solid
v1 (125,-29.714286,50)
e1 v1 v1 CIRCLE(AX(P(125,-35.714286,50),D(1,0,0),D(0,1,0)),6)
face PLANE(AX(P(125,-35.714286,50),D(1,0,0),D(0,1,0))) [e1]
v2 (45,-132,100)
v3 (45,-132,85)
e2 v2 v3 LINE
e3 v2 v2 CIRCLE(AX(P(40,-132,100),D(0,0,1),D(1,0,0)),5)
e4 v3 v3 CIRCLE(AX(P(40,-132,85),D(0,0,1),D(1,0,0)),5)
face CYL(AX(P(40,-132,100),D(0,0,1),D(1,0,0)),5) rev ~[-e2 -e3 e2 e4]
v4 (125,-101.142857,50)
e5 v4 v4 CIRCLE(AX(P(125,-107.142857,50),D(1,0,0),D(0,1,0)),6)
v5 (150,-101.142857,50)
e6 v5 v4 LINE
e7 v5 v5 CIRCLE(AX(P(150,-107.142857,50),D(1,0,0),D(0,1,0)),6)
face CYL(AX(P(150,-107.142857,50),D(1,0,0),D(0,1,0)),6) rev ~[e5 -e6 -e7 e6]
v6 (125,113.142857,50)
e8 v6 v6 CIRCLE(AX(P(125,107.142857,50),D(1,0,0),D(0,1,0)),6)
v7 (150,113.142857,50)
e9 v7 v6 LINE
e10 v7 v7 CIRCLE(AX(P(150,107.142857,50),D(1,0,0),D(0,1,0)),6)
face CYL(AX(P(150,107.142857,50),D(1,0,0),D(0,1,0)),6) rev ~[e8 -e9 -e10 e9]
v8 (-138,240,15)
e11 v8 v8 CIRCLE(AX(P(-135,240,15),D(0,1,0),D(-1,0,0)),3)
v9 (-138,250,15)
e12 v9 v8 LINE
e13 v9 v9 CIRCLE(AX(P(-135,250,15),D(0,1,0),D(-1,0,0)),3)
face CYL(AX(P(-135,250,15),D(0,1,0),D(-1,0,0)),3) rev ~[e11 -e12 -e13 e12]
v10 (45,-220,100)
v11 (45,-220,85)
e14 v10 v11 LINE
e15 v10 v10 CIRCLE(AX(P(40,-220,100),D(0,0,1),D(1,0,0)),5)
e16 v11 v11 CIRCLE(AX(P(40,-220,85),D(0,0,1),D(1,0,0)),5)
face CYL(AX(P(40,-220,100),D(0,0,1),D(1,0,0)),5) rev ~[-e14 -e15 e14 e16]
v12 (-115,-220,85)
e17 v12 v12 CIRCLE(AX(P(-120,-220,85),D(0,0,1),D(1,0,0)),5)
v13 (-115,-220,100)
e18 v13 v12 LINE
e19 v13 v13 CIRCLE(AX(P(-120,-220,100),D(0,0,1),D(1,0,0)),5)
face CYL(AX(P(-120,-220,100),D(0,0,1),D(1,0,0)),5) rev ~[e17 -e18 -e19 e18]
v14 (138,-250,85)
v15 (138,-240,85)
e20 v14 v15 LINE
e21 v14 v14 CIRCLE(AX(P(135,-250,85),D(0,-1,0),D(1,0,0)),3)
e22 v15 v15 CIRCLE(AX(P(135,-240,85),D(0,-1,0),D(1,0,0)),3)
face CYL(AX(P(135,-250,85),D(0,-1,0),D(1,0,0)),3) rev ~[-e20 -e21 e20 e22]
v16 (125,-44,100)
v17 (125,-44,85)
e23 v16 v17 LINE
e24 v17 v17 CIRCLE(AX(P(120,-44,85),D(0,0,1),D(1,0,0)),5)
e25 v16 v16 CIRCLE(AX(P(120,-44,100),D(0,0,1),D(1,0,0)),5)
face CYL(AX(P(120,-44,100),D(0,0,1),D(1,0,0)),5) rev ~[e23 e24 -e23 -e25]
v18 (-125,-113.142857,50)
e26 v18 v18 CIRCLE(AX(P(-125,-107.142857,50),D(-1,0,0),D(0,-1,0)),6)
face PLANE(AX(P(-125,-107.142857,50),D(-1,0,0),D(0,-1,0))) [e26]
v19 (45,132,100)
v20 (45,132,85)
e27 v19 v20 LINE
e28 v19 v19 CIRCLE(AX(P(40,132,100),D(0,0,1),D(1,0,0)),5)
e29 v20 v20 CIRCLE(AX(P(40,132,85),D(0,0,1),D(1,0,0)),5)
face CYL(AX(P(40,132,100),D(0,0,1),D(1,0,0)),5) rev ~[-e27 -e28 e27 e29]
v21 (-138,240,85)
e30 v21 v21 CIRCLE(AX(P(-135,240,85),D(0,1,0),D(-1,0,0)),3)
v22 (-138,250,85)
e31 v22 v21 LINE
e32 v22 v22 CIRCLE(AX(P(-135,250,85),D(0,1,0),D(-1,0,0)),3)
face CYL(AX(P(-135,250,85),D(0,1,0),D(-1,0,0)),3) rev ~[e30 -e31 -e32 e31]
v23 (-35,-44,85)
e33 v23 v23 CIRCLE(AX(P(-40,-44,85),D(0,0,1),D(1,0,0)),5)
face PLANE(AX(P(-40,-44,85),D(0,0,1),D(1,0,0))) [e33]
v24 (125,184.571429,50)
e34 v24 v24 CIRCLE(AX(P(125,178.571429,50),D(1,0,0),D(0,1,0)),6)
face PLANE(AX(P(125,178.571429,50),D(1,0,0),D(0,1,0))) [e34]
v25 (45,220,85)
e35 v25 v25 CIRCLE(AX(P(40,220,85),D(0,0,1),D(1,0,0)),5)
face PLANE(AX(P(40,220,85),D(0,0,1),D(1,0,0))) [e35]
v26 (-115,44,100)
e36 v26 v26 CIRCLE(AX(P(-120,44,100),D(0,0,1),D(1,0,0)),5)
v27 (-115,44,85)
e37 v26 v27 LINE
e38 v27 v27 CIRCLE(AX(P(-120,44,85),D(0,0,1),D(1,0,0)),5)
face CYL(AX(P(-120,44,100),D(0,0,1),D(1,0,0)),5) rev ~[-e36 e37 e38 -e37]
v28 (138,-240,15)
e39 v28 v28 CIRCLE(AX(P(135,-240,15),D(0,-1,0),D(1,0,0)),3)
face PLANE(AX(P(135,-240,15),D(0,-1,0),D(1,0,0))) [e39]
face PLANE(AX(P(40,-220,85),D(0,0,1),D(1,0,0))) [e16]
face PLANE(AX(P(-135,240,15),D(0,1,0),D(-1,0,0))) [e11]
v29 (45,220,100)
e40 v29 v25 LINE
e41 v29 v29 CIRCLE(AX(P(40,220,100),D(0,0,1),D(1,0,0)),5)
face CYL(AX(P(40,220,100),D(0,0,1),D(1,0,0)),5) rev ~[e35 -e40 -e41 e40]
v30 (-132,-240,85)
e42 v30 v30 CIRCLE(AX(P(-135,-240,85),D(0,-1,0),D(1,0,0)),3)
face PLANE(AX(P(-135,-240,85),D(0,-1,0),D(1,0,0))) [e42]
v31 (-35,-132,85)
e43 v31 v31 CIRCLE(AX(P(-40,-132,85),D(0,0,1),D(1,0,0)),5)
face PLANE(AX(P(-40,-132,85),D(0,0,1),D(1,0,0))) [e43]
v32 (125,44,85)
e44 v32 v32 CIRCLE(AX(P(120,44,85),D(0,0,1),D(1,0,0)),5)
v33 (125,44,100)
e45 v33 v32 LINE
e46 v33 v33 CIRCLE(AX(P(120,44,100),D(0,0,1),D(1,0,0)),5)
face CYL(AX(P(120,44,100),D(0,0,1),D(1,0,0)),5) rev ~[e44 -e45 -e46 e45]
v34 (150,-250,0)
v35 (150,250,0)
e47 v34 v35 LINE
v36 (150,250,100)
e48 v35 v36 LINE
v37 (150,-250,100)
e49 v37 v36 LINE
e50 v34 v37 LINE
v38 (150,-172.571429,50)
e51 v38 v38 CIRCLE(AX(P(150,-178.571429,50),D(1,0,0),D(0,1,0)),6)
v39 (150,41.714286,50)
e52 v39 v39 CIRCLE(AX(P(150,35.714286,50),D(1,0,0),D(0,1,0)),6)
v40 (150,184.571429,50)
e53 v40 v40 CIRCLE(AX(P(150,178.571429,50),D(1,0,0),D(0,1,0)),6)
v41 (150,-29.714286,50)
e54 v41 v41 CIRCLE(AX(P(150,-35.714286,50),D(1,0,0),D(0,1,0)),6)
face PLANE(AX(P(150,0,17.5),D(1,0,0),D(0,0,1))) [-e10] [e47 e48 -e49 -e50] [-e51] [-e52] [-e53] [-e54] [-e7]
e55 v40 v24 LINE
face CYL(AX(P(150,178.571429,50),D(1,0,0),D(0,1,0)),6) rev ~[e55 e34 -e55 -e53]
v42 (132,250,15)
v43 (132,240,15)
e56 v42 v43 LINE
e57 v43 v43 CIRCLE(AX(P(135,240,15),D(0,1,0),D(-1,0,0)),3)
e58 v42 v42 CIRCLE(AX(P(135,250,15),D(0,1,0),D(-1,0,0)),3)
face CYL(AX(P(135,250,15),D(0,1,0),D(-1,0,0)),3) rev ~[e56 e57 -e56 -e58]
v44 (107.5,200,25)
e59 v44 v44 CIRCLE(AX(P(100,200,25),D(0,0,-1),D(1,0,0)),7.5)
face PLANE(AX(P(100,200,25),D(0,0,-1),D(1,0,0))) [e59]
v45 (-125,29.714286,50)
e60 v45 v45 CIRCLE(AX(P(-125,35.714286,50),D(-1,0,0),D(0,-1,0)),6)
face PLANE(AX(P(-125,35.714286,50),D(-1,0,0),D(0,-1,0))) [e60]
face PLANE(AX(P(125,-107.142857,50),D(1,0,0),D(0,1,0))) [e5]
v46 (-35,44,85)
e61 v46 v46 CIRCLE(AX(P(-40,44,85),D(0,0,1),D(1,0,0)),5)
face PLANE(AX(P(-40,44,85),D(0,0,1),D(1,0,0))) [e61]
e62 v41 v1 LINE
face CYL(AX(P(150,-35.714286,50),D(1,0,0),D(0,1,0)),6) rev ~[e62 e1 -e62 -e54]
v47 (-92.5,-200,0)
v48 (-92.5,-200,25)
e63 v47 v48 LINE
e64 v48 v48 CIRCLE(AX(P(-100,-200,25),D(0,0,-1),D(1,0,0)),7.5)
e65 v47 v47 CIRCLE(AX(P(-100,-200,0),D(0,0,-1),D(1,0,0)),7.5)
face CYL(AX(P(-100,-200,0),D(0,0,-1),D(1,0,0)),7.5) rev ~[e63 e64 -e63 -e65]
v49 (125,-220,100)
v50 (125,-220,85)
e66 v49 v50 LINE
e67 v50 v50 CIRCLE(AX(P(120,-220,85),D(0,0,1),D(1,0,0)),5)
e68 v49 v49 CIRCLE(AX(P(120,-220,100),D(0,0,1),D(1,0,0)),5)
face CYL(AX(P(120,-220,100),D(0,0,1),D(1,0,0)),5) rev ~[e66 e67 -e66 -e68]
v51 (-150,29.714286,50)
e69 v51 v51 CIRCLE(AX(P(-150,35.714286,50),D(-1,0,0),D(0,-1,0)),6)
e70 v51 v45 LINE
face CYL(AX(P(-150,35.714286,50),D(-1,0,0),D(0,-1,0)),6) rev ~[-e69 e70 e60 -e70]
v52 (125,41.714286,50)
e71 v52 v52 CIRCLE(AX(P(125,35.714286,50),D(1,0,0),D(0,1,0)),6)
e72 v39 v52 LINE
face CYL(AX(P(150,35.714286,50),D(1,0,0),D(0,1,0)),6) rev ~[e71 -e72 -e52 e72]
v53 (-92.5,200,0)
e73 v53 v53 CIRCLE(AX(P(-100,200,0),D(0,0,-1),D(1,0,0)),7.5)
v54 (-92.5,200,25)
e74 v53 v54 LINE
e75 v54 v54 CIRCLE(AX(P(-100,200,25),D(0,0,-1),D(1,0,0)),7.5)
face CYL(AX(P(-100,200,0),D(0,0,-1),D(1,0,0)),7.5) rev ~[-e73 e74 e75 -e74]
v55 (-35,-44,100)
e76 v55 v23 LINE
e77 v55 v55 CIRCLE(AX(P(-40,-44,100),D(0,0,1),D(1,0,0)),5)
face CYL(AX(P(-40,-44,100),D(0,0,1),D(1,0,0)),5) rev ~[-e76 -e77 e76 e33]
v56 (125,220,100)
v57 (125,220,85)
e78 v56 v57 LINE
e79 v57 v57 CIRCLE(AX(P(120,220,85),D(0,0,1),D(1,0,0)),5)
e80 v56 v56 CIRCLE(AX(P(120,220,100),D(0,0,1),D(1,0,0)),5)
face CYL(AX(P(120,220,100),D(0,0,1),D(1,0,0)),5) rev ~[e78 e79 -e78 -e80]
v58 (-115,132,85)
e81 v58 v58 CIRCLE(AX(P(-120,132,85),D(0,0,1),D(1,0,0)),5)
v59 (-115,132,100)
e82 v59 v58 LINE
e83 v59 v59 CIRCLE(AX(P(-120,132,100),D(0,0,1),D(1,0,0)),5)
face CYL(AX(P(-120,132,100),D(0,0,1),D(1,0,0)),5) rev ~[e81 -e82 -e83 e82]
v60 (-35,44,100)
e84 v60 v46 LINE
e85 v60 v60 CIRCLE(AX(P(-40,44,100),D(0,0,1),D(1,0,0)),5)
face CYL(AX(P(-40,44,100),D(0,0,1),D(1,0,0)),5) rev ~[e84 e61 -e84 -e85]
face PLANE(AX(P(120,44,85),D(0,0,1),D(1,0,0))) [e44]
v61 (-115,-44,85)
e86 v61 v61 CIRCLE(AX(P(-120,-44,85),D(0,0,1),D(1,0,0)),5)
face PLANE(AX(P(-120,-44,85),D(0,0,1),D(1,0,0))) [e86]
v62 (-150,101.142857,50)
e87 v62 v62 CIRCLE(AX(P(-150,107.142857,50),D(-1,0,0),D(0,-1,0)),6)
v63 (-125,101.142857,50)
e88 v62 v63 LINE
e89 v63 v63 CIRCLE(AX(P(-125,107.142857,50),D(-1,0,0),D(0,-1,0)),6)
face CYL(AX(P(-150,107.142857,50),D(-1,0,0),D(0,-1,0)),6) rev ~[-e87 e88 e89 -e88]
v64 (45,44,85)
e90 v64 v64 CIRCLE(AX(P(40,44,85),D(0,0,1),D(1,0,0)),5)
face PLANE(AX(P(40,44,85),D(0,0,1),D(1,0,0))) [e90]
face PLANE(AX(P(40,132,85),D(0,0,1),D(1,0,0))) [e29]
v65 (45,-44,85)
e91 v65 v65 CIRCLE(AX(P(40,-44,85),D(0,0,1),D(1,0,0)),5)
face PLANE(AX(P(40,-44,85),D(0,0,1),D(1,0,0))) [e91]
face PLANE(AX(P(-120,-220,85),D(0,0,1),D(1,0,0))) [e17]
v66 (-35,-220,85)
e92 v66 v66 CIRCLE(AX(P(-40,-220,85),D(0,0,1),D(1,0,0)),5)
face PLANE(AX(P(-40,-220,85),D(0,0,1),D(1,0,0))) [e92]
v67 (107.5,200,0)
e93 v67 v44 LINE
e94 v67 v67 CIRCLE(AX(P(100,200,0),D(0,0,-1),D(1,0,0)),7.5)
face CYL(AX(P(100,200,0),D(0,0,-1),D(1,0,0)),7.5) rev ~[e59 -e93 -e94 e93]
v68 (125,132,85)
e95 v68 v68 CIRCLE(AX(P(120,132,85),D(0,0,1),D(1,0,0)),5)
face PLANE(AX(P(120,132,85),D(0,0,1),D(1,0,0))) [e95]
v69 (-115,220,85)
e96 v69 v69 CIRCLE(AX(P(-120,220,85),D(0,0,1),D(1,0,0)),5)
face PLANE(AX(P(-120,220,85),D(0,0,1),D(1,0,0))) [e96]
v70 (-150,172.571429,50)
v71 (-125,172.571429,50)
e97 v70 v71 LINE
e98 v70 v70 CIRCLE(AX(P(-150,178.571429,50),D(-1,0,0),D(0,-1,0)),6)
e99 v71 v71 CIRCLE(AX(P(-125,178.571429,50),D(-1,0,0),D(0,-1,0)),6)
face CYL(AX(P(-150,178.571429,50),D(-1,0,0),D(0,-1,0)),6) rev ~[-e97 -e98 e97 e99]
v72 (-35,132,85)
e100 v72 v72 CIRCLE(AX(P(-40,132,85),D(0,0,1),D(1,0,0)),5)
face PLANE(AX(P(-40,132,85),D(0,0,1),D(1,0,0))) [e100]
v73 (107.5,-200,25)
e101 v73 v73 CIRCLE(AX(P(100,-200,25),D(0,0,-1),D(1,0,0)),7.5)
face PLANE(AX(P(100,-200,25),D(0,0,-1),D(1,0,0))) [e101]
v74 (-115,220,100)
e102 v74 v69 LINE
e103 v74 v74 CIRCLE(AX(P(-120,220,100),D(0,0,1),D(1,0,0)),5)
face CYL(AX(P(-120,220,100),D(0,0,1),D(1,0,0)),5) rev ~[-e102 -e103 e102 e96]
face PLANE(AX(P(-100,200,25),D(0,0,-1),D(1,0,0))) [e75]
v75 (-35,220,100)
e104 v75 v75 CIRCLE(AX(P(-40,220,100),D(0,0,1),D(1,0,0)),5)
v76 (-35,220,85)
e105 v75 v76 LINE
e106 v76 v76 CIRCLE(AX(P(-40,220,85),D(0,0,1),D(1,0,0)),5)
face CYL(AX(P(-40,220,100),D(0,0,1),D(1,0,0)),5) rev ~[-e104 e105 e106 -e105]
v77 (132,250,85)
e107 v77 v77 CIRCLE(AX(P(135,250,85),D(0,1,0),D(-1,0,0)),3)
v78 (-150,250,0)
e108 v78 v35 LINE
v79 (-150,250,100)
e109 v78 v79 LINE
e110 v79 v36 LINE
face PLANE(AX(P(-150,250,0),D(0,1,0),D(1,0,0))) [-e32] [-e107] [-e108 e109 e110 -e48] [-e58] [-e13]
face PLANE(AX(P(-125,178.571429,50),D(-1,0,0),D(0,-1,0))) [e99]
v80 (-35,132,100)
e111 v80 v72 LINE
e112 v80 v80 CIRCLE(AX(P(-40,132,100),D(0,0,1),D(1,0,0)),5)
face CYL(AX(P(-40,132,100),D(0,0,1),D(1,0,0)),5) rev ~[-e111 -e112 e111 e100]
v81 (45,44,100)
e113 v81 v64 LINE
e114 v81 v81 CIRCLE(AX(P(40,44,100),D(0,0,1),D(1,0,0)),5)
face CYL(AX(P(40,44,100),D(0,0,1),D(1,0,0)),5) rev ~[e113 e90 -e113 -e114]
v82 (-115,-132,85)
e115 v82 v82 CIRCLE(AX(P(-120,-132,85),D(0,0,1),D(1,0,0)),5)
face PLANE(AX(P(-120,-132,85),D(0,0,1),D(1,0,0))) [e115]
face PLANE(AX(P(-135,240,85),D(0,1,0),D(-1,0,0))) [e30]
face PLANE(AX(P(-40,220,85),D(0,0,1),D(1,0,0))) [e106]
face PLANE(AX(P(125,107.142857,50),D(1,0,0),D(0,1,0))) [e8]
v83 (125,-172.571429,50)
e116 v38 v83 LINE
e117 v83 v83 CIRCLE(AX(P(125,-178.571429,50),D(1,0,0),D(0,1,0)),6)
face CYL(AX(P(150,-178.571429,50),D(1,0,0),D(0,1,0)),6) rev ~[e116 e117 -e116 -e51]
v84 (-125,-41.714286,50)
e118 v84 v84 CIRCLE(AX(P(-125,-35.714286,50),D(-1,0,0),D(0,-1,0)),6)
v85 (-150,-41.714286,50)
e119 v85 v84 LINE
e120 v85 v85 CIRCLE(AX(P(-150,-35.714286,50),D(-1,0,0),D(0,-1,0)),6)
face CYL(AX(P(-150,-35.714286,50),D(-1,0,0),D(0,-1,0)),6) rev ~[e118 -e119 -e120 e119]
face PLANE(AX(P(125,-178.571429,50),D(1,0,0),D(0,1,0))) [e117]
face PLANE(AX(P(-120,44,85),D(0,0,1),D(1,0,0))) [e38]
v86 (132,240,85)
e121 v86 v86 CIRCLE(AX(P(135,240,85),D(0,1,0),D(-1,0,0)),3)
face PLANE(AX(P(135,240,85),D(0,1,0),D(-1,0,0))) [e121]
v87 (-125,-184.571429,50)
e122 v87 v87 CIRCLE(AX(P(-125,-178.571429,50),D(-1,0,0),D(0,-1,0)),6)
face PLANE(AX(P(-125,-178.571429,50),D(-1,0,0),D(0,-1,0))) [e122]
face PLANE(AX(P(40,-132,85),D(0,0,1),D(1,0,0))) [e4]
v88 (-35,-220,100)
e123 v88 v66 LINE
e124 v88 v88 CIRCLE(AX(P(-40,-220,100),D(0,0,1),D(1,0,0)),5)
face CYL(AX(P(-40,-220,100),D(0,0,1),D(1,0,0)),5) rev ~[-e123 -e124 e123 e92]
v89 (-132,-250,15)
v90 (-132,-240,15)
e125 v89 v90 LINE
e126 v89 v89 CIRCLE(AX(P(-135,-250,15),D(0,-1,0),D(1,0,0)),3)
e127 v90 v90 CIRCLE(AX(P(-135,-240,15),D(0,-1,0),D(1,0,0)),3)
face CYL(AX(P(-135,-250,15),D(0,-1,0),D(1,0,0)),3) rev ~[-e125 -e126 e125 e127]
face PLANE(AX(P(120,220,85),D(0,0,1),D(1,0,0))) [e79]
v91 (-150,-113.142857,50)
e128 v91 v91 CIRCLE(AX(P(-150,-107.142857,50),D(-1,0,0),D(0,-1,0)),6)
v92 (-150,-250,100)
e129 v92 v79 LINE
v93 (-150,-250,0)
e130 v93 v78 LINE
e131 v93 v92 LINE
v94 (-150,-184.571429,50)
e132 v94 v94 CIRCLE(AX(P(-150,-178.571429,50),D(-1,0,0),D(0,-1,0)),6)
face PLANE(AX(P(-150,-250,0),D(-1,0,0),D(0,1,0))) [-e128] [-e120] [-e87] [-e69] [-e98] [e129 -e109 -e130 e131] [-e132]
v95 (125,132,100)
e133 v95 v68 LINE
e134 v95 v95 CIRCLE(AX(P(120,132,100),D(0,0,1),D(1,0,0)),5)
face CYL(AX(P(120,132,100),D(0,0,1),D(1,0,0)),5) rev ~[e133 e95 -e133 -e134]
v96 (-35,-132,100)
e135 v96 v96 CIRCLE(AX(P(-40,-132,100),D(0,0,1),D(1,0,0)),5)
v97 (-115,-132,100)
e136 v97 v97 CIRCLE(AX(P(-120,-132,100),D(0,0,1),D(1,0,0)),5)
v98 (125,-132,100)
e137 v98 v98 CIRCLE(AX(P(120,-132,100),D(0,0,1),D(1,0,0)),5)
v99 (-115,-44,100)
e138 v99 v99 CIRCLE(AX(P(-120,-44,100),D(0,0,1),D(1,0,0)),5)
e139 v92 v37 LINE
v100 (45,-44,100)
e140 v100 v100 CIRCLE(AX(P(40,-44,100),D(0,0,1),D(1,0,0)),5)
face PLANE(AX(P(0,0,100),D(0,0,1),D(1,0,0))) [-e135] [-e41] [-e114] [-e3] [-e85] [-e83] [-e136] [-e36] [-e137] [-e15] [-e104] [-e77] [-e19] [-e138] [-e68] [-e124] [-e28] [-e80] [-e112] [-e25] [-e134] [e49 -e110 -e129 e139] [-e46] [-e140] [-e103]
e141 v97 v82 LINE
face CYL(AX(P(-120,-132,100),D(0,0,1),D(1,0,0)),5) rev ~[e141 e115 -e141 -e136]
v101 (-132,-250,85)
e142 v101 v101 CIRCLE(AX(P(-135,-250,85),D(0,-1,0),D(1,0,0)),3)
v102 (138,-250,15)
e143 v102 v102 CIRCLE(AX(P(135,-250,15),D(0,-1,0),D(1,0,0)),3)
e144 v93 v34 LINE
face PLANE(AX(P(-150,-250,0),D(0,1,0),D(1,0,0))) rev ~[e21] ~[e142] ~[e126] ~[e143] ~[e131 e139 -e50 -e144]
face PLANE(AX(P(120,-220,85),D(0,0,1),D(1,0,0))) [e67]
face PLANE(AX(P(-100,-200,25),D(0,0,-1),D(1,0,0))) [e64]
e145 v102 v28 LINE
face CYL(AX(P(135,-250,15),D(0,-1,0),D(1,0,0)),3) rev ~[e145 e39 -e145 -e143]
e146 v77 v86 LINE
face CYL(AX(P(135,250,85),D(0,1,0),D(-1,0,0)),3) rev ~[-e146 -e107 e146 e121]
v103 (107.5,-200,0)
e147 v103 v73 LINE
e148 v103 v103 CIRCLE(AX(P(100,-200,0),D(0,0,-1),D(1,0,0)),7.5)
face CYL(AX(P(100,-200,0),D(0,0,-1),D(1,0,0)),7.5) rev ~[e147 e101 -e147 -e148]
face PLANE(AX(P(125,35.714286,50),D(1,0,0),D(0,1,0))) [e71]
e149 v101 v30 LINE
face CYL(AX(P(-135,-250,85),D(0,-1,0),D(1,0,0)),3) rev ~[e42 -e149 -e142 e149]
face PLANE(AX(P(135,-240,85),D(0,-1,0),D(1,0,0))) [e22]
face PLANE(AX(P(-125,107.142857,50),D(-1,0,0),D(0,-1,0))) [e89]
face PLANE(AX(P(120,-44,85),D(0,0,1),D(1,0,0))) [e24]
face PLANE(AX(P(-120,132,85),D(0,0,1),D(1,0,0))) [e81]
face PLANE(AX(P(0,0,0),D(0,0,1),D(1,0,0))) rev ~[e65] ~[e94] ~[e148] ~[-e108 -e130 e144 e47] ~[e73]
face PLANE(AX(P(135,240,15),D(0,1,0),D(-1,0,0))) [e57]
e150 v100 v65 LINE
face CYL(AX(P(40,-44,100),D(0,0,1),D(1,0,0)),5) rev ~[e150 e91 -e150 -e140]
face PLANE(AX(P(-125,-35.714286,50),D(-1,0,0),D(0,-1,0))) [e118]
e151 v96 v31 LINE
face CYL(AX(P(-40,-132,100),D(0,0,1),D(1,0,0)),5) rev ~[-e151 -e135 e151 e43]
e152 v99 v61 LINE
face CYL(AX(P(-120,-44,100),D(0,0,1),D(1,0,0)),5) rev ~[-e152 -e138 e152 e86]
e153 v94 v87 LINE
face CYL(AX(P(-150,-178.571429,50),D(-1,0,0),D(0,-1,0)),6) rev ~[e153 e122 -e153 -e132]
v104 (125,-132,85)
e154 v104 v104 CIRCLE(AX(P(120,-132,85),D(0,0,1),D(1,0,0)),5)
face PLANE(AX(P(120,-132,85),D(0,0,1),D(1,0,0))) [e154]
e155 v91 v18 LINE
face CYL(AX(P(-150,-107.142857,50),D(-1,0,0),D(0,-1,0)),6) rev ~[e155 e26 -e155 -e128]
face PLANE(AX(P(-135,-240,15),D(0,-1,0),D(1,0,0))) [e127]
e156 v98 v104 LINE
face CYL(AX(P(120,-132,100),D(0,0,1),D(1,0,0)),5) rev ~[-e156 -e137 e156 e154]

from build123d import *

# Parameters (mm, degrees)
F0_W          = 300
F0_H          = 500
F1_DEPTH      = 100
F4_DEPTH      = 225
F4_DEPTH_BACK = 225
F5_DEPTH      = 225
F5_DEPTH_BACK = 225
F2_R          = 7.5
F6_DEPTH      = 25
F7_R          = 6
F8_DEPTH      = 25
F9_R          = 6
F10_DEPTH     = 25
F11_R         = 3
F12_DEPTH     = 10
F13_R         = 3
F14_DEPTH     = 10
F15_R         = 5
F16_DEPTH     = 15


# Not quite as in the source:
# - a feature of the source that left no trace in its solid (it failed there, or was rolled back) is left out


with BuildPart() as f1:
    # F0 (on Top) → F1 (new body)
    with BuildSketch(Plane.XY):
        Rectangle(F0_W, F0_H)
    extrude(amount=F1_DEPTH)

    # F3 (on Front) → F4 (cut, two sides)
    with BuildSketch(Plane.XZ) as f4_sk:
        Polygon((150, 17.5), (150, 82.5), (120, 82.5), (120, 67.5), (140, 67.5), (140, 32.5), (120, 32.5), (120, 17.5), align=None)
        Polygon((-120, 82.5), (-150, 82.5), (-150, 17.5), (-120, 17.5), (-120, 32.5), (-140, 32.5), (-140, 67.5), (-120, 67.5), align=None)
    extrude(amount=-F4_DEPTH, mode=Mode.SUBTRACT)
    extrude(f4_sk.sketch, amount=F4_DEPTH_BACK, mode=Mode.SUBTRACT)

    # F3 (on Front) → F5 (join, two sides)
    with BuildSketch(Plane.XZ) as f5_sk:
        Polygon((150, 17.5), (150, 82.5), (120, 82.5), (120, 67.5), (140, 67.5), (140, 32.5), (120, 32.5), (120, 17.5), align=None)
        Polygon((-120, 82.5), (-150, 82.5), (-150, 17.5), (-120, 17.5), (-120, 32.5), (-140, 32.5), (-140, 67.5), (-120, 67.5), align=None)
    extrude(amount=F5_DEPTH)
    extrude(f5_sk.sketch, amount=-F5_DEPTH_BACK)

    # F2 (on face) → F6 (cut)
    with BuildSketch(Plane(origin=(0, 0, 0), x_dir=(1, 0, 0), z_dir=(0, 0, -1))):
        with Locations((-100, 200)):
            Circle(F2_R)
        with Locations((100, 200)):
            Circle(F2_R)
        with Locations((100, -200)):
            Circle(F2_R)
        with Locations((-100, -200)):
            Circle(F2_R)
    extrude(amount=-F6_DEPTH, mode=Mode.SUBTRACT)

    # F7 (on face) → F8 (cut)
    with BuildSketch(Plane(origin=(-150, 0, 0), x_dir=(0, -1, 0), z_dir=(-1, 0, 0))):
        with Locations((-178.5714285714, 50)):
            Circle(F7_R)
        with Locations((-107.1428571429, 50)):
            Circle(F7_R)
        with Locations((-35.7142857143, 50)):
            Circle(F7_R)
        with Locations((35.7142857143, 50)):
            Circle(F7_R)
        with Locations((107.1428571429, 50)):
            Circle(F7_R)
        with Locations((178.5714285714, 50)):
            Circle(F7_R)
    extrude(amount=-F8_DEPTH, mode=Mode.SUBTRACT)

    # F9 (on face) → F10 (cut)
    with BuildSketch(Plane.YZ.offset(150)):
        with Locations((-178.5714285714, 50)):
            Circle(F9_R)
        with Locations((-107.1428571429, 50)):
            Circle(F9_R)
        with Locations((-35.7142857143, 50)):
            Circle(F9_R)
        with Locations((35.7142857143, 50)):
            Circle(F9_R)
        with Locations((107.1428571429, 50)):
            Circle(F9_R)
        with Locations((178.5714285714, 50)):
            Circle(F9_R)
    extrude(amount=-F10_DEPTH, mode=Mode.SUBTRACT)

    # F11 (on face) → F12 (cut)
    with BuildSketch(Plane(origin=(0, 250, 0), x_dir=(-1, 0, 0), z_dir=(0, 1, 0))):
        with Locations((-135, 85)):
            Circle(F11_R)
        with Locations((-135, 15)):
            Circle(F11_R)
        with Locations((135, 15)):
            Circle(F11_R)
        with Locations((135, 85)):
            Circle(F11_R)
    extrude(amount=-F12_DEPTH, mode=Mode.SUBTRACT)

    # F13 (on face) → F14 (cut)
    with BuildSketch(Plane.XZ.offset(250)):
        with Locations((135, 85)):
            Circle(F13_R)
        with Locations((135, 15)):
            Circle(F13_R)
        with Locations((-135, 15)):
            Circle(F13_R)
        with Locations((-135, 85)):
            Circle(F13_R)
    extrude(amount=-F14_DEPTH, mode=Mode.SUBTRACT)

    # F15 (on face) → F16 (cut)
    with BuildSketch(Plane.XY.offset(100)):
        with Locations((120, 220)):
            Circle(F15_R)
        with Locations((120, 132)):
            Circle(F15_R)
        with Locations((120, 44)):
            Circle(F15_R)
        with Locations((120, -44)):
            Circle(F15_R)
        with Locations((120, -132)):
            Circle(F15_R)
        with Locations((120, -220)):
            Circle(F15_R)
        with Locations((40, 220)):
            Circle(F15_R)
        with Locations((40, 132)):
            Circle(F15_R)
        with Locations((40, 44)):
            Circle(F15_R)
        with Locations((40, -44)):
            Circle(F15_R)
        with Locations((40, -132)):
            Circle(F15_R)
        with Locations((40, -220)):
            Circle(F15_R)
        with Locations((-40, 220)):
            Circle(F15_R)
        with Locations((-40, 132)):
            Circle(F15_R)
        with Locations((-40, 44)):
            Circle(F15_R)
        with Locations((-40, -44)):
            Circle(F15_R)
        with Locations((-40, -132)):
            Circle(F15_R)
        with Locations((-40, -220)):
            Circle(F15_R)
        with Locations((-120, 220)):
            Circle(F15_R)
        with Locations((-120, 132)):
            Circle(F15_R)
        with Locations((-120, 44)):
            Circle(F15_R)
        with Locations((-120, -44)):
            Circle(F15_R)
        with Locations((-120, -132)):
            Circle(F15_R)
        with Locations((-120, -220)):
            Circle(F15_R)
    extrude(amount=-F16_DEPTH, mode=Mode.SUBTRACT)


solid = f1.part
